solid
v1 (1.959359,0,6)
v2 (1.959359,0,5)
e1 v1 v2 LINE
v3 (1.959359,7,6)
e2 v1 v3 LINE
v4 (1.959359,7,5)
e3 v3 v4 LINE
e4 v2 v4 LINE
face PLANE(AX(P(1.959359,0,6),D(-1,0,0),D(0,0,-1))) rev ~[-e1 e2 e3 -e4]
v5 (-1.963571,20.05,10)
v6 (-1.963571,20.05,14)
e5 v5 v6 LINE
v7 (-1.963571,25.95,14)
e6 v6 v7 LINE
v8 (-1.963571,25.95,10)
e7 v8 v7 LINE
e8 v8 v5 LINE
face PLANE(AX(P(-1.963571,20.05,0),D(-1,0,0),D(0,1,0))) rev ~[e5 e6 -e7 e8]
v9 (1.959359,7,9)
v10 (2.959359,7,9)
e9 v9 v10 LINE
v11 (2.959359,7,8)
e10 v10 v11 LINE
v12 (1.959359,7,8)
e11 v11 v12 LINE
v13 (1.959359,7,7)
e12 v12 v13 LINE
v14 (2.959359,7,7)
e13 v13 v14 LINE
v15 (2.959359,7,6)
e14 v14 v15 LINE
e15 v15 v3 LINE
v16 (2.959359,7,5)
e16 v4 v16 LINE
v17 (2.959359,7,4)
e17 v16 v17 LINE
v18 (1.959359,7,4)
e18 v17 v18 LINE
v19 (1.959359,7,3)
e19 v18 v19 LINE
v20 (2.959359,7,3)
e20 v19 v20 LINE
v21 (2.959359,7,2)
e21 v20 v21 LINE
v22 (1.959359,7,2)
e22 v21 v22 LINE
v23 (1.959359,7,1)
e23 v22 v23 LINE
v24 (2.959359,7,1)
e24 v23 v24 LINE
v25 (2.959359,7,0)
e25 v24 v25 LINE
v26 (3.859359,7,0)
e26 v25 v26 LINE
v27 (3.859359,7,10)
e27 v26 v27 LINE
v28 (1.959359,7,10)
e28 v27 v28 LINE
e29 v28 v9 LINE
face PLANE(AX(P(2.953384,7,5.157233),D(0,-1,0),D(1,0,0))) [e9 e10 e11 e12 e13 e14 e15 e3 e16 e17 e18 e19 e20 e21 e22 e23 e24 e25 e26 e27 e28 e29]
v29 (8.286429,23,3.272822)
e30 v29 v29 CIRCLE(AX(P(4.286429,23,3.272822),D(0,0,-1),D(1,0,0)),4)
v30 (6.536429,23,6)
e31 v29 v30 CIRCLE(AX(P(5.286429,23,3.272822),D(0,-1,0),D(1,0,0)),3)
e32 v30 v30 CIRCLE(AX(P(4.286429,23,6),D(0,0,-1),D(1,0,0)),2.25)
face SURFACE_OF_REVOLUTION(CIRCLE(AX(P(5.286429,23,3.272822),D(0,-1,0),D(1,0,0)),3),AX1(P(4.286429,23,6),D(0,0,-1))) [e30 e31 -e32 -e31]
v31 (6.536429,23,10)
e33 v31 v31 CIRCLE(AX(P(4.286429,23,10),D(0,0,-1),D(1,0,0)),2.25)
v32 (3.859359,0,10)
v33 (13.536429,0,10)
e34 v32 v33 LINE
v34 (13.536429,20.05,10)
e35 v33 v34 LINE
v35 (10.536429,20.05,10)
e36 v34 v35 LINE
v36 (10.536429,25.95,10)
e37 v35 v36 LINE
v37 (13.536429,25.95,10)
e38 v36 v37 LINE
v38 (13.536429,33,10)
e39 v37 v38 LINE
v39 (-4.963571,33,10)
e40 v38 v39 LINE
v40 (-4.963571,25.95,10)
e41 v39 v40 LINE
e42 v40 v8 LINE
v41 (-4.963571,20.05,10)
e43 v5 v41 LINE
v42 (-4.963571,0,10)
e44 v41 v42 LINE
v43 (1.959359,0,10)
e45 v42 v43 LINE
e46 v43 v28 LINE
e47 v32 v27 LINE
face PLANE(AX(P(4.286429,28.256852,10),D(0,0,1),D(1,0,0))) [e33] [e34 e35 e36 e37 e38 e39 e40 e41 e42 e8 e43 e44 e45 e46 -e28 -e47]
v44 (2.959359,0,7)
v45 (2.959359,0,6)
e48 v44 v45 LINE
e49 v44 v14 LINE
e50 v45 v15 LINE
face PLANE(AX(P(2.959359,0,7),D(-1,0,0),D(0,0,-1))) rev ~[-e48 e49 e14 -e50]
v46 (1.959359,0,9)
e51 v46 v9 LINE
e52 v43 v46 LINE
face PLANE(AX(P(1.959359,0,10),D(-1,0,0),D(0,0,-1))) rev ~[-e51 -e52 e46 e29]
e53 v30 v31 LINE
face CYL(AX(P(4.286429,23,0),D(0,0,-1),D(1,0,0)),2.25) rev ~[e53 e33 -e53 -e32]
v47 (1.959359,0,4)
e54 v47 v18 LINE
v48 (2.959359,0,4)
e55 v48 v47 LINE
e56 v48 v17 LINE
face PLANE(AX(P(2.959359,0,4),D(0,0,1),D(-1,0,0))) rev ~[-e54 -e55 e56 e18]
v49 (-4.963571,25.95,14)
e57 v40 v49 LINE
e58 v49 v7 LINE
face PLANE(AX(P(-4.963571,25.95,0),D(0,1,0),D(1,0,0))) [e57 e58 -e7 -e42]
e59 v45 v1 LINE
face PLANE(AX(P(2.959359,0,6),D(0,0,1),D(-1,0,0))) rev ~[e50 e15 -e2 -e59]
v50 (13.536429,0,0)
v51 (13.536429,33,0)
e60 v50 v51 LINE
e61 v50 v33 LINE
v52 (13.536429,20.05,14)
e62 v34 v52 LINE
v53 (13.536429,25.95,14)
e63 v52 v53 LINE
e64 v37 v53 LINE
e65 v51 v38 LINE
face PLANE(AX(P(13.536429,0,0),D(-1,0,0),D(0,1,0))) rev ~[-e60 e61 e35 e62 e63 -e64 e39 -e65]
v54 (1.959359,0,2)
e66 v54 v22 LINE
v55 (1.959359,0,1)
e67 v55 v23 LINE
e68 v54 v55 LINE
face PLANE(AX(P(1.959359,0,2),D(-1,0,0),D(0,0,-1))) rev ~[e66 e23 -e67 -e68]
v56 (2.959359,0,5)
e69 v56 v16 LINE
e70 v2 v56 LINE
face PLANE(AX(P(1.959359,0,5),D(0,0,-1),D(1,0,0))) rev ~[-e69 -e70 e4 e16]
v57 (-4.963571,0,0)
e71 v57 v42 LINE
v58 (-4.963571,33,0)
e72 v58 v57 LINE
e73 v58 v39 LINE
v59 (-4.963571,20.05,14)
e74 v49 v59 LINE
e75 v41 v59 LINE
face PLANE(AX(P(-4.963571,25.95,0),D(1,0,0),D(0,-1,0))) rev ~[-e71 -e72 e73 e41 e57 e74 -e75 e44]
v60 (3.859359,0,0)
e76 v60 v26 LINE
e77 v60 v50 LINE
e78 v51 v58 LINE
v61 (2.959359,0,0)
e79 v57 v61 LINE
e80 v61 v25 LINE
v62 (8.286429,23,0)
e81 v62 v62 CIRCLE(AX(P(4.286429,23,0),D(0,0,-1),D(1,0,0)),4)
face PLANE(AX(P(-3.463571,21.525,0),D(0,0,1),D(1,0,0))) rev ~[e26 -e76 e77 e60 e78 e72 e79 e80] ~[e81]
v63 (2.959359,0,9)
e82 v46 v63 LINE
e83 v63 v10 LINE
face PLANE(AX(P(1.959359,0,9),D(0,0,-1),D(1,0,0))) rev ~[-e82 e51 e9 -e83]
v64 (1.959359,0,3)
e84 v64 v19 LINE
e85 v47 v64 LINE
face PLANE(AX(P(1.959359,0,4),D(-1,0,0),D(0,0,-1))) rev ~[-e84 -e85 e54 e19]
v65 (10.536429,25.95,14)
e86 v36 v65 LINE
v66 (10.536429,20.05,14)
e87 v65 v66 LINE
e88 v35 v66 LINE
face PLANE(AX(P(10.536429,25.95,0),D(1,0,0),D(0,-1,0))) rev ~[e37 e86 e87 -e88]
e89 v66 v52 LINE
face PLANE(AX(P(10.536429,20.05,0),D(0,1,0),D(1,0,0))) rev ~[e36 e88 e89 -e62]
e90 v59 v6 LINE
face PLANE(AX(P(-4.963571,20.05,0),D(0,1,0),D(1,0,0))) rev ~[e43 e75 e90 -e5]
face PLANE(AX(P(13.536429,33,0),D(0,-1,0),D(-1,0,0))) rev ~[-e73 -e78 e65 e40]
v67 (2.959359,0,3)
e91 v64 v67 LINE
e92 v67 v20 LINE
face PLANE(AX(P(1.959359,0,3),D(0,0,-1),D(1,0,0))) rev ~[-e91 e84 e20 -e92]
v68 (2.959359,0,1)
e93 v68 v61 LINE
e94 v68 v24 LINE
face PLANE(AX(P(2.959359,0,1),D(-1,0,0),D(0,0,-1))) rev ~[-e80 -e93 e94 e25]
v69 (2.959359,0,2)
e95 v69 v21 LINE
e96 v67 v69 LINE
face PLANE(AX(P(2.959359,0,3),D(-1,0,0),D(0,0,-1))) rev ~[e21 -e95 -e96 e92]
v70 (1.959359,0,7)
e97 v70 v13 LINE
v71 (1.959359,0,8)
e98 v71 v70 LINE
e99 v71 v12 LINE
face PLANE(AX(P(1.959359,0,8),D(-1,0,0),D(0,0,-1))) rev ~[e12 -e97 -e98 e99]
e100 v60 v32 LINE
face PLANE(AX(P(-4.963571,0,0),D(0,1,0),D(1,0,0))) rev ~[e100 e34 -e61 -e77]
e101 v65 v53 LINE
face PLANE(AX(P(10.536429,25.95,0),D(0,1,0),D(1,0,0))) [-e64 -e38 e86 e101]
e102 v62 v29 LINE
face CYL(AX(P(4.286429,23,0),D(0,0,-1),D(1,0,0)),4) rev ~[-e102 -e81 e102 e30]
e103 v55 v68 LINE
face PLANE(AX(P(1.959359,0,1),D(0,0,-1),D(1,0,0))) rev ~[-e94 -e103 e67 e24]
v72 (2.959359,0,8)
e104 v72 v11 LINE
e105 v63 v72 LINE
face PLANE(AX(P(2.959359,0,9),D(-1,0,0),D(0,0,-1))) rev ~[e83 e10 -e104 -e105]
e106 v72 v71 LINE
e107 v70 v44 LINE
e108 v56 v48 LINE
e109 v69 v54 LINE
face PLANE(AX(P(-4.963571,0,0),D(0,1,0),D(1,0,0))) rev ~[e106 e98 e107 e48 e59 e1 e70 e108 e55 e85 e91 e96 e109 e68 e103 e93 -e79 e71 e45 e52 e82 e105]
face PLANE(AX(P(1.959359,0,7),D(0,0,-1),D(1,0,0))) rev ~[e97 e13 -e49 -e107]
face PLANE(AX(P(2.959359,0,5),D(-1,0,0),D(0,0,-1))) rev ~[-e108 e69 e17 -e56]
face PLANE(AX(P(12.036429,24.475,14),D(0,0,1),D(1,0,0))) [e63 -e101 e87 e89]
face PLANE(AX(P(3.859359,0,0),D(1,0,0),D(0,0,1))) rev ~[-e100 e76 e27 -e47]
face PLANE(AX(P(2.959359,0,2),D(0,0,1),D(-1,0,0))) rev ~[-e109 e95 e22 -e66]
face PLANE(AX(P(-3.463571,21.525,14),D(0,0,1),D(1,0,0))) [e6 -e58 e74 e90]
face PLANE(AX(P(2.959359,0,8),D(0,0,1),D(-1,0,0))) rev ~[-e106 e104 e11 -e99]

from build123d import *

# Parameters (mm, degrees)
F0_W     = 18.5
F0_H     = 13
F1_DEPTH = 10
F0_W_2   = 3
F0_H_2   = 2.95
F2_DEPTH = 14
F4_DEPTH = 7
F5_R     = 4
F5_R_2   = 2.25
F6_DEPTH = 6


# Not quite as in the source:
# - a fillet or chamfer that OpenCascade refuses, or shapes differently, is made with other operations: its cross-section is extruded or revolved along the edge and cut away or added


with BuildPart() as f1:
    # F0 (on Top) → F1 (new body)
    with BuildSketch(Plane.XY):
        with BuildLine():
            Line((-4.96357069, 33), (-4.96357069, 25.95))
            Line((-4.96357069, 25.95), (-1.96357069, 25.95))
            Line((-1.96357069, 25.95), (-1.96357069, 23))
            Line((-1.96357069, 23), (2.03642931, 23))
            ThreePointArc((2.03642931, 23), (4.28642931, 25.25), (6.53642931, 23))
            Line((6.53642931, 23), (10.53642931, 23))
            Line((10.53642931, 23), (10.53642931, 25.95))
            Line((10.53642931, 25.95), (13.53642931, 25.95))
            Line((13.53642931, 25.95), (13.53642931, 33))
            Line((13.53642931, 33), (-4.96357069, 33))
        make_face()
        with BuildLine():
            Line((-4.96357069, 20.05), (-4.96357069, 13))
            Line((-4.96357069, 13), (13.53642931, 13))
            Line((13.53642931, 13), (13.53642931, 20.05))
            Line((13.53642931, 20.05), (10.53642931, 20.05))
            Line((10.53642931, 20.05), (10.53642931, 23))
            Line((10.53642931, 23), (6.53642931, 23))
            ThreePointArc((6.53642931, 23), (4.28642931, 20.75), (2.03642931, 23))
            Line((2.03642931, 23), (-1.96357069, 23))
            Line((-1.96357069, 23), (-1.96357069, 20.05))
            Line((-1.96357069, 20.05), (-4.96357069, 20.05))
        make_face()
        with Locations((4.28642931, 6.5)):
            Rectangle(F0_W, F0_H)
    extrude(amount=F1_DEPTH)

    # F0 (on Top) → F2 (join)
    with BuildSketch(Plane.XY):
        with Locations((-3.46357069, 21.525)):
            Rectangle(F0_W_2, F0_H_2)
        with Locations((-3.46357069, 24.475)):
            Rectangle(F0_W_2, F0_H_2)
        with Locations((12.03642931, 24.475)):
            Rectangle(F0_W_2, F0_H_2)
        with Locations((12.03642931, 21.525)):
            Rectangle(F0_W_2, F0_H_2)
    extrude(amount=F2_DEPTH)

    # F3 (on face) → F4 (cut)
    with BuildSketch(Plane.XZ):
        Polygon((3.8593590405, 10), (1.9593590405, 10), (1.9593590405, 9), (2.9593590405, 9), (2.9593590405, 8), (1.9593590405, 8), (1.9593590405, 7), (2.9593590405, 7), (2.9593590405, 6), (1.9593590405, 6), (1.9593590405, 5), (2.9593590405, 5), (2.9593590405, 4), (1.9593590405, 4), (1.9593590405, 3), (2.9593590405, 3), (2.9593590405, 2), (1.9593590405, 2), (1.9593590405, 1), (2.9593590405, 1), (2.9593590405, 0), (3.8593590405, 0), align=None)
    extrude(amount=-F4_DEPTH, mode=Mode.SUBTRACT)

    # F5 (on face) → F6 (cut)
    with BuildSketch(Plane(origin=(0, 0, 0), x_dir=(1, 0, 0), z_dir=(0, 0, -1))):
        with Locations((4.28642931, -23)):
            Circle(F5_R)
        with Locations((4.28642931, -23)):
            Circle(F5_R_2, mode=Mode.SUBTRACT)
    extrude(amount=-F6_DEPTH, mode=Mode.SUBTRACT)

    # F7: fillet of radius 3 on 1 edges, made by hand

    # F7_s1 → F7_t2 (revolve)
    with BuildSketch(Plane.XZ.offset(-23)):
        with BuildLine():
            ThreePointArc((8.28642931, 3.2728219713), (7.8113055446, 4.8930071459), (6.53642931, 6))
            Line((6.53642931, 6), (8.28642931, 6))
            Line((8.28642931, 6), (8.28642931, 3.2728219713))
        make_face()
    revolve(axis=Axis((4.28642931, 23, 6), (0, 0, -1)))


solid = f1.part
